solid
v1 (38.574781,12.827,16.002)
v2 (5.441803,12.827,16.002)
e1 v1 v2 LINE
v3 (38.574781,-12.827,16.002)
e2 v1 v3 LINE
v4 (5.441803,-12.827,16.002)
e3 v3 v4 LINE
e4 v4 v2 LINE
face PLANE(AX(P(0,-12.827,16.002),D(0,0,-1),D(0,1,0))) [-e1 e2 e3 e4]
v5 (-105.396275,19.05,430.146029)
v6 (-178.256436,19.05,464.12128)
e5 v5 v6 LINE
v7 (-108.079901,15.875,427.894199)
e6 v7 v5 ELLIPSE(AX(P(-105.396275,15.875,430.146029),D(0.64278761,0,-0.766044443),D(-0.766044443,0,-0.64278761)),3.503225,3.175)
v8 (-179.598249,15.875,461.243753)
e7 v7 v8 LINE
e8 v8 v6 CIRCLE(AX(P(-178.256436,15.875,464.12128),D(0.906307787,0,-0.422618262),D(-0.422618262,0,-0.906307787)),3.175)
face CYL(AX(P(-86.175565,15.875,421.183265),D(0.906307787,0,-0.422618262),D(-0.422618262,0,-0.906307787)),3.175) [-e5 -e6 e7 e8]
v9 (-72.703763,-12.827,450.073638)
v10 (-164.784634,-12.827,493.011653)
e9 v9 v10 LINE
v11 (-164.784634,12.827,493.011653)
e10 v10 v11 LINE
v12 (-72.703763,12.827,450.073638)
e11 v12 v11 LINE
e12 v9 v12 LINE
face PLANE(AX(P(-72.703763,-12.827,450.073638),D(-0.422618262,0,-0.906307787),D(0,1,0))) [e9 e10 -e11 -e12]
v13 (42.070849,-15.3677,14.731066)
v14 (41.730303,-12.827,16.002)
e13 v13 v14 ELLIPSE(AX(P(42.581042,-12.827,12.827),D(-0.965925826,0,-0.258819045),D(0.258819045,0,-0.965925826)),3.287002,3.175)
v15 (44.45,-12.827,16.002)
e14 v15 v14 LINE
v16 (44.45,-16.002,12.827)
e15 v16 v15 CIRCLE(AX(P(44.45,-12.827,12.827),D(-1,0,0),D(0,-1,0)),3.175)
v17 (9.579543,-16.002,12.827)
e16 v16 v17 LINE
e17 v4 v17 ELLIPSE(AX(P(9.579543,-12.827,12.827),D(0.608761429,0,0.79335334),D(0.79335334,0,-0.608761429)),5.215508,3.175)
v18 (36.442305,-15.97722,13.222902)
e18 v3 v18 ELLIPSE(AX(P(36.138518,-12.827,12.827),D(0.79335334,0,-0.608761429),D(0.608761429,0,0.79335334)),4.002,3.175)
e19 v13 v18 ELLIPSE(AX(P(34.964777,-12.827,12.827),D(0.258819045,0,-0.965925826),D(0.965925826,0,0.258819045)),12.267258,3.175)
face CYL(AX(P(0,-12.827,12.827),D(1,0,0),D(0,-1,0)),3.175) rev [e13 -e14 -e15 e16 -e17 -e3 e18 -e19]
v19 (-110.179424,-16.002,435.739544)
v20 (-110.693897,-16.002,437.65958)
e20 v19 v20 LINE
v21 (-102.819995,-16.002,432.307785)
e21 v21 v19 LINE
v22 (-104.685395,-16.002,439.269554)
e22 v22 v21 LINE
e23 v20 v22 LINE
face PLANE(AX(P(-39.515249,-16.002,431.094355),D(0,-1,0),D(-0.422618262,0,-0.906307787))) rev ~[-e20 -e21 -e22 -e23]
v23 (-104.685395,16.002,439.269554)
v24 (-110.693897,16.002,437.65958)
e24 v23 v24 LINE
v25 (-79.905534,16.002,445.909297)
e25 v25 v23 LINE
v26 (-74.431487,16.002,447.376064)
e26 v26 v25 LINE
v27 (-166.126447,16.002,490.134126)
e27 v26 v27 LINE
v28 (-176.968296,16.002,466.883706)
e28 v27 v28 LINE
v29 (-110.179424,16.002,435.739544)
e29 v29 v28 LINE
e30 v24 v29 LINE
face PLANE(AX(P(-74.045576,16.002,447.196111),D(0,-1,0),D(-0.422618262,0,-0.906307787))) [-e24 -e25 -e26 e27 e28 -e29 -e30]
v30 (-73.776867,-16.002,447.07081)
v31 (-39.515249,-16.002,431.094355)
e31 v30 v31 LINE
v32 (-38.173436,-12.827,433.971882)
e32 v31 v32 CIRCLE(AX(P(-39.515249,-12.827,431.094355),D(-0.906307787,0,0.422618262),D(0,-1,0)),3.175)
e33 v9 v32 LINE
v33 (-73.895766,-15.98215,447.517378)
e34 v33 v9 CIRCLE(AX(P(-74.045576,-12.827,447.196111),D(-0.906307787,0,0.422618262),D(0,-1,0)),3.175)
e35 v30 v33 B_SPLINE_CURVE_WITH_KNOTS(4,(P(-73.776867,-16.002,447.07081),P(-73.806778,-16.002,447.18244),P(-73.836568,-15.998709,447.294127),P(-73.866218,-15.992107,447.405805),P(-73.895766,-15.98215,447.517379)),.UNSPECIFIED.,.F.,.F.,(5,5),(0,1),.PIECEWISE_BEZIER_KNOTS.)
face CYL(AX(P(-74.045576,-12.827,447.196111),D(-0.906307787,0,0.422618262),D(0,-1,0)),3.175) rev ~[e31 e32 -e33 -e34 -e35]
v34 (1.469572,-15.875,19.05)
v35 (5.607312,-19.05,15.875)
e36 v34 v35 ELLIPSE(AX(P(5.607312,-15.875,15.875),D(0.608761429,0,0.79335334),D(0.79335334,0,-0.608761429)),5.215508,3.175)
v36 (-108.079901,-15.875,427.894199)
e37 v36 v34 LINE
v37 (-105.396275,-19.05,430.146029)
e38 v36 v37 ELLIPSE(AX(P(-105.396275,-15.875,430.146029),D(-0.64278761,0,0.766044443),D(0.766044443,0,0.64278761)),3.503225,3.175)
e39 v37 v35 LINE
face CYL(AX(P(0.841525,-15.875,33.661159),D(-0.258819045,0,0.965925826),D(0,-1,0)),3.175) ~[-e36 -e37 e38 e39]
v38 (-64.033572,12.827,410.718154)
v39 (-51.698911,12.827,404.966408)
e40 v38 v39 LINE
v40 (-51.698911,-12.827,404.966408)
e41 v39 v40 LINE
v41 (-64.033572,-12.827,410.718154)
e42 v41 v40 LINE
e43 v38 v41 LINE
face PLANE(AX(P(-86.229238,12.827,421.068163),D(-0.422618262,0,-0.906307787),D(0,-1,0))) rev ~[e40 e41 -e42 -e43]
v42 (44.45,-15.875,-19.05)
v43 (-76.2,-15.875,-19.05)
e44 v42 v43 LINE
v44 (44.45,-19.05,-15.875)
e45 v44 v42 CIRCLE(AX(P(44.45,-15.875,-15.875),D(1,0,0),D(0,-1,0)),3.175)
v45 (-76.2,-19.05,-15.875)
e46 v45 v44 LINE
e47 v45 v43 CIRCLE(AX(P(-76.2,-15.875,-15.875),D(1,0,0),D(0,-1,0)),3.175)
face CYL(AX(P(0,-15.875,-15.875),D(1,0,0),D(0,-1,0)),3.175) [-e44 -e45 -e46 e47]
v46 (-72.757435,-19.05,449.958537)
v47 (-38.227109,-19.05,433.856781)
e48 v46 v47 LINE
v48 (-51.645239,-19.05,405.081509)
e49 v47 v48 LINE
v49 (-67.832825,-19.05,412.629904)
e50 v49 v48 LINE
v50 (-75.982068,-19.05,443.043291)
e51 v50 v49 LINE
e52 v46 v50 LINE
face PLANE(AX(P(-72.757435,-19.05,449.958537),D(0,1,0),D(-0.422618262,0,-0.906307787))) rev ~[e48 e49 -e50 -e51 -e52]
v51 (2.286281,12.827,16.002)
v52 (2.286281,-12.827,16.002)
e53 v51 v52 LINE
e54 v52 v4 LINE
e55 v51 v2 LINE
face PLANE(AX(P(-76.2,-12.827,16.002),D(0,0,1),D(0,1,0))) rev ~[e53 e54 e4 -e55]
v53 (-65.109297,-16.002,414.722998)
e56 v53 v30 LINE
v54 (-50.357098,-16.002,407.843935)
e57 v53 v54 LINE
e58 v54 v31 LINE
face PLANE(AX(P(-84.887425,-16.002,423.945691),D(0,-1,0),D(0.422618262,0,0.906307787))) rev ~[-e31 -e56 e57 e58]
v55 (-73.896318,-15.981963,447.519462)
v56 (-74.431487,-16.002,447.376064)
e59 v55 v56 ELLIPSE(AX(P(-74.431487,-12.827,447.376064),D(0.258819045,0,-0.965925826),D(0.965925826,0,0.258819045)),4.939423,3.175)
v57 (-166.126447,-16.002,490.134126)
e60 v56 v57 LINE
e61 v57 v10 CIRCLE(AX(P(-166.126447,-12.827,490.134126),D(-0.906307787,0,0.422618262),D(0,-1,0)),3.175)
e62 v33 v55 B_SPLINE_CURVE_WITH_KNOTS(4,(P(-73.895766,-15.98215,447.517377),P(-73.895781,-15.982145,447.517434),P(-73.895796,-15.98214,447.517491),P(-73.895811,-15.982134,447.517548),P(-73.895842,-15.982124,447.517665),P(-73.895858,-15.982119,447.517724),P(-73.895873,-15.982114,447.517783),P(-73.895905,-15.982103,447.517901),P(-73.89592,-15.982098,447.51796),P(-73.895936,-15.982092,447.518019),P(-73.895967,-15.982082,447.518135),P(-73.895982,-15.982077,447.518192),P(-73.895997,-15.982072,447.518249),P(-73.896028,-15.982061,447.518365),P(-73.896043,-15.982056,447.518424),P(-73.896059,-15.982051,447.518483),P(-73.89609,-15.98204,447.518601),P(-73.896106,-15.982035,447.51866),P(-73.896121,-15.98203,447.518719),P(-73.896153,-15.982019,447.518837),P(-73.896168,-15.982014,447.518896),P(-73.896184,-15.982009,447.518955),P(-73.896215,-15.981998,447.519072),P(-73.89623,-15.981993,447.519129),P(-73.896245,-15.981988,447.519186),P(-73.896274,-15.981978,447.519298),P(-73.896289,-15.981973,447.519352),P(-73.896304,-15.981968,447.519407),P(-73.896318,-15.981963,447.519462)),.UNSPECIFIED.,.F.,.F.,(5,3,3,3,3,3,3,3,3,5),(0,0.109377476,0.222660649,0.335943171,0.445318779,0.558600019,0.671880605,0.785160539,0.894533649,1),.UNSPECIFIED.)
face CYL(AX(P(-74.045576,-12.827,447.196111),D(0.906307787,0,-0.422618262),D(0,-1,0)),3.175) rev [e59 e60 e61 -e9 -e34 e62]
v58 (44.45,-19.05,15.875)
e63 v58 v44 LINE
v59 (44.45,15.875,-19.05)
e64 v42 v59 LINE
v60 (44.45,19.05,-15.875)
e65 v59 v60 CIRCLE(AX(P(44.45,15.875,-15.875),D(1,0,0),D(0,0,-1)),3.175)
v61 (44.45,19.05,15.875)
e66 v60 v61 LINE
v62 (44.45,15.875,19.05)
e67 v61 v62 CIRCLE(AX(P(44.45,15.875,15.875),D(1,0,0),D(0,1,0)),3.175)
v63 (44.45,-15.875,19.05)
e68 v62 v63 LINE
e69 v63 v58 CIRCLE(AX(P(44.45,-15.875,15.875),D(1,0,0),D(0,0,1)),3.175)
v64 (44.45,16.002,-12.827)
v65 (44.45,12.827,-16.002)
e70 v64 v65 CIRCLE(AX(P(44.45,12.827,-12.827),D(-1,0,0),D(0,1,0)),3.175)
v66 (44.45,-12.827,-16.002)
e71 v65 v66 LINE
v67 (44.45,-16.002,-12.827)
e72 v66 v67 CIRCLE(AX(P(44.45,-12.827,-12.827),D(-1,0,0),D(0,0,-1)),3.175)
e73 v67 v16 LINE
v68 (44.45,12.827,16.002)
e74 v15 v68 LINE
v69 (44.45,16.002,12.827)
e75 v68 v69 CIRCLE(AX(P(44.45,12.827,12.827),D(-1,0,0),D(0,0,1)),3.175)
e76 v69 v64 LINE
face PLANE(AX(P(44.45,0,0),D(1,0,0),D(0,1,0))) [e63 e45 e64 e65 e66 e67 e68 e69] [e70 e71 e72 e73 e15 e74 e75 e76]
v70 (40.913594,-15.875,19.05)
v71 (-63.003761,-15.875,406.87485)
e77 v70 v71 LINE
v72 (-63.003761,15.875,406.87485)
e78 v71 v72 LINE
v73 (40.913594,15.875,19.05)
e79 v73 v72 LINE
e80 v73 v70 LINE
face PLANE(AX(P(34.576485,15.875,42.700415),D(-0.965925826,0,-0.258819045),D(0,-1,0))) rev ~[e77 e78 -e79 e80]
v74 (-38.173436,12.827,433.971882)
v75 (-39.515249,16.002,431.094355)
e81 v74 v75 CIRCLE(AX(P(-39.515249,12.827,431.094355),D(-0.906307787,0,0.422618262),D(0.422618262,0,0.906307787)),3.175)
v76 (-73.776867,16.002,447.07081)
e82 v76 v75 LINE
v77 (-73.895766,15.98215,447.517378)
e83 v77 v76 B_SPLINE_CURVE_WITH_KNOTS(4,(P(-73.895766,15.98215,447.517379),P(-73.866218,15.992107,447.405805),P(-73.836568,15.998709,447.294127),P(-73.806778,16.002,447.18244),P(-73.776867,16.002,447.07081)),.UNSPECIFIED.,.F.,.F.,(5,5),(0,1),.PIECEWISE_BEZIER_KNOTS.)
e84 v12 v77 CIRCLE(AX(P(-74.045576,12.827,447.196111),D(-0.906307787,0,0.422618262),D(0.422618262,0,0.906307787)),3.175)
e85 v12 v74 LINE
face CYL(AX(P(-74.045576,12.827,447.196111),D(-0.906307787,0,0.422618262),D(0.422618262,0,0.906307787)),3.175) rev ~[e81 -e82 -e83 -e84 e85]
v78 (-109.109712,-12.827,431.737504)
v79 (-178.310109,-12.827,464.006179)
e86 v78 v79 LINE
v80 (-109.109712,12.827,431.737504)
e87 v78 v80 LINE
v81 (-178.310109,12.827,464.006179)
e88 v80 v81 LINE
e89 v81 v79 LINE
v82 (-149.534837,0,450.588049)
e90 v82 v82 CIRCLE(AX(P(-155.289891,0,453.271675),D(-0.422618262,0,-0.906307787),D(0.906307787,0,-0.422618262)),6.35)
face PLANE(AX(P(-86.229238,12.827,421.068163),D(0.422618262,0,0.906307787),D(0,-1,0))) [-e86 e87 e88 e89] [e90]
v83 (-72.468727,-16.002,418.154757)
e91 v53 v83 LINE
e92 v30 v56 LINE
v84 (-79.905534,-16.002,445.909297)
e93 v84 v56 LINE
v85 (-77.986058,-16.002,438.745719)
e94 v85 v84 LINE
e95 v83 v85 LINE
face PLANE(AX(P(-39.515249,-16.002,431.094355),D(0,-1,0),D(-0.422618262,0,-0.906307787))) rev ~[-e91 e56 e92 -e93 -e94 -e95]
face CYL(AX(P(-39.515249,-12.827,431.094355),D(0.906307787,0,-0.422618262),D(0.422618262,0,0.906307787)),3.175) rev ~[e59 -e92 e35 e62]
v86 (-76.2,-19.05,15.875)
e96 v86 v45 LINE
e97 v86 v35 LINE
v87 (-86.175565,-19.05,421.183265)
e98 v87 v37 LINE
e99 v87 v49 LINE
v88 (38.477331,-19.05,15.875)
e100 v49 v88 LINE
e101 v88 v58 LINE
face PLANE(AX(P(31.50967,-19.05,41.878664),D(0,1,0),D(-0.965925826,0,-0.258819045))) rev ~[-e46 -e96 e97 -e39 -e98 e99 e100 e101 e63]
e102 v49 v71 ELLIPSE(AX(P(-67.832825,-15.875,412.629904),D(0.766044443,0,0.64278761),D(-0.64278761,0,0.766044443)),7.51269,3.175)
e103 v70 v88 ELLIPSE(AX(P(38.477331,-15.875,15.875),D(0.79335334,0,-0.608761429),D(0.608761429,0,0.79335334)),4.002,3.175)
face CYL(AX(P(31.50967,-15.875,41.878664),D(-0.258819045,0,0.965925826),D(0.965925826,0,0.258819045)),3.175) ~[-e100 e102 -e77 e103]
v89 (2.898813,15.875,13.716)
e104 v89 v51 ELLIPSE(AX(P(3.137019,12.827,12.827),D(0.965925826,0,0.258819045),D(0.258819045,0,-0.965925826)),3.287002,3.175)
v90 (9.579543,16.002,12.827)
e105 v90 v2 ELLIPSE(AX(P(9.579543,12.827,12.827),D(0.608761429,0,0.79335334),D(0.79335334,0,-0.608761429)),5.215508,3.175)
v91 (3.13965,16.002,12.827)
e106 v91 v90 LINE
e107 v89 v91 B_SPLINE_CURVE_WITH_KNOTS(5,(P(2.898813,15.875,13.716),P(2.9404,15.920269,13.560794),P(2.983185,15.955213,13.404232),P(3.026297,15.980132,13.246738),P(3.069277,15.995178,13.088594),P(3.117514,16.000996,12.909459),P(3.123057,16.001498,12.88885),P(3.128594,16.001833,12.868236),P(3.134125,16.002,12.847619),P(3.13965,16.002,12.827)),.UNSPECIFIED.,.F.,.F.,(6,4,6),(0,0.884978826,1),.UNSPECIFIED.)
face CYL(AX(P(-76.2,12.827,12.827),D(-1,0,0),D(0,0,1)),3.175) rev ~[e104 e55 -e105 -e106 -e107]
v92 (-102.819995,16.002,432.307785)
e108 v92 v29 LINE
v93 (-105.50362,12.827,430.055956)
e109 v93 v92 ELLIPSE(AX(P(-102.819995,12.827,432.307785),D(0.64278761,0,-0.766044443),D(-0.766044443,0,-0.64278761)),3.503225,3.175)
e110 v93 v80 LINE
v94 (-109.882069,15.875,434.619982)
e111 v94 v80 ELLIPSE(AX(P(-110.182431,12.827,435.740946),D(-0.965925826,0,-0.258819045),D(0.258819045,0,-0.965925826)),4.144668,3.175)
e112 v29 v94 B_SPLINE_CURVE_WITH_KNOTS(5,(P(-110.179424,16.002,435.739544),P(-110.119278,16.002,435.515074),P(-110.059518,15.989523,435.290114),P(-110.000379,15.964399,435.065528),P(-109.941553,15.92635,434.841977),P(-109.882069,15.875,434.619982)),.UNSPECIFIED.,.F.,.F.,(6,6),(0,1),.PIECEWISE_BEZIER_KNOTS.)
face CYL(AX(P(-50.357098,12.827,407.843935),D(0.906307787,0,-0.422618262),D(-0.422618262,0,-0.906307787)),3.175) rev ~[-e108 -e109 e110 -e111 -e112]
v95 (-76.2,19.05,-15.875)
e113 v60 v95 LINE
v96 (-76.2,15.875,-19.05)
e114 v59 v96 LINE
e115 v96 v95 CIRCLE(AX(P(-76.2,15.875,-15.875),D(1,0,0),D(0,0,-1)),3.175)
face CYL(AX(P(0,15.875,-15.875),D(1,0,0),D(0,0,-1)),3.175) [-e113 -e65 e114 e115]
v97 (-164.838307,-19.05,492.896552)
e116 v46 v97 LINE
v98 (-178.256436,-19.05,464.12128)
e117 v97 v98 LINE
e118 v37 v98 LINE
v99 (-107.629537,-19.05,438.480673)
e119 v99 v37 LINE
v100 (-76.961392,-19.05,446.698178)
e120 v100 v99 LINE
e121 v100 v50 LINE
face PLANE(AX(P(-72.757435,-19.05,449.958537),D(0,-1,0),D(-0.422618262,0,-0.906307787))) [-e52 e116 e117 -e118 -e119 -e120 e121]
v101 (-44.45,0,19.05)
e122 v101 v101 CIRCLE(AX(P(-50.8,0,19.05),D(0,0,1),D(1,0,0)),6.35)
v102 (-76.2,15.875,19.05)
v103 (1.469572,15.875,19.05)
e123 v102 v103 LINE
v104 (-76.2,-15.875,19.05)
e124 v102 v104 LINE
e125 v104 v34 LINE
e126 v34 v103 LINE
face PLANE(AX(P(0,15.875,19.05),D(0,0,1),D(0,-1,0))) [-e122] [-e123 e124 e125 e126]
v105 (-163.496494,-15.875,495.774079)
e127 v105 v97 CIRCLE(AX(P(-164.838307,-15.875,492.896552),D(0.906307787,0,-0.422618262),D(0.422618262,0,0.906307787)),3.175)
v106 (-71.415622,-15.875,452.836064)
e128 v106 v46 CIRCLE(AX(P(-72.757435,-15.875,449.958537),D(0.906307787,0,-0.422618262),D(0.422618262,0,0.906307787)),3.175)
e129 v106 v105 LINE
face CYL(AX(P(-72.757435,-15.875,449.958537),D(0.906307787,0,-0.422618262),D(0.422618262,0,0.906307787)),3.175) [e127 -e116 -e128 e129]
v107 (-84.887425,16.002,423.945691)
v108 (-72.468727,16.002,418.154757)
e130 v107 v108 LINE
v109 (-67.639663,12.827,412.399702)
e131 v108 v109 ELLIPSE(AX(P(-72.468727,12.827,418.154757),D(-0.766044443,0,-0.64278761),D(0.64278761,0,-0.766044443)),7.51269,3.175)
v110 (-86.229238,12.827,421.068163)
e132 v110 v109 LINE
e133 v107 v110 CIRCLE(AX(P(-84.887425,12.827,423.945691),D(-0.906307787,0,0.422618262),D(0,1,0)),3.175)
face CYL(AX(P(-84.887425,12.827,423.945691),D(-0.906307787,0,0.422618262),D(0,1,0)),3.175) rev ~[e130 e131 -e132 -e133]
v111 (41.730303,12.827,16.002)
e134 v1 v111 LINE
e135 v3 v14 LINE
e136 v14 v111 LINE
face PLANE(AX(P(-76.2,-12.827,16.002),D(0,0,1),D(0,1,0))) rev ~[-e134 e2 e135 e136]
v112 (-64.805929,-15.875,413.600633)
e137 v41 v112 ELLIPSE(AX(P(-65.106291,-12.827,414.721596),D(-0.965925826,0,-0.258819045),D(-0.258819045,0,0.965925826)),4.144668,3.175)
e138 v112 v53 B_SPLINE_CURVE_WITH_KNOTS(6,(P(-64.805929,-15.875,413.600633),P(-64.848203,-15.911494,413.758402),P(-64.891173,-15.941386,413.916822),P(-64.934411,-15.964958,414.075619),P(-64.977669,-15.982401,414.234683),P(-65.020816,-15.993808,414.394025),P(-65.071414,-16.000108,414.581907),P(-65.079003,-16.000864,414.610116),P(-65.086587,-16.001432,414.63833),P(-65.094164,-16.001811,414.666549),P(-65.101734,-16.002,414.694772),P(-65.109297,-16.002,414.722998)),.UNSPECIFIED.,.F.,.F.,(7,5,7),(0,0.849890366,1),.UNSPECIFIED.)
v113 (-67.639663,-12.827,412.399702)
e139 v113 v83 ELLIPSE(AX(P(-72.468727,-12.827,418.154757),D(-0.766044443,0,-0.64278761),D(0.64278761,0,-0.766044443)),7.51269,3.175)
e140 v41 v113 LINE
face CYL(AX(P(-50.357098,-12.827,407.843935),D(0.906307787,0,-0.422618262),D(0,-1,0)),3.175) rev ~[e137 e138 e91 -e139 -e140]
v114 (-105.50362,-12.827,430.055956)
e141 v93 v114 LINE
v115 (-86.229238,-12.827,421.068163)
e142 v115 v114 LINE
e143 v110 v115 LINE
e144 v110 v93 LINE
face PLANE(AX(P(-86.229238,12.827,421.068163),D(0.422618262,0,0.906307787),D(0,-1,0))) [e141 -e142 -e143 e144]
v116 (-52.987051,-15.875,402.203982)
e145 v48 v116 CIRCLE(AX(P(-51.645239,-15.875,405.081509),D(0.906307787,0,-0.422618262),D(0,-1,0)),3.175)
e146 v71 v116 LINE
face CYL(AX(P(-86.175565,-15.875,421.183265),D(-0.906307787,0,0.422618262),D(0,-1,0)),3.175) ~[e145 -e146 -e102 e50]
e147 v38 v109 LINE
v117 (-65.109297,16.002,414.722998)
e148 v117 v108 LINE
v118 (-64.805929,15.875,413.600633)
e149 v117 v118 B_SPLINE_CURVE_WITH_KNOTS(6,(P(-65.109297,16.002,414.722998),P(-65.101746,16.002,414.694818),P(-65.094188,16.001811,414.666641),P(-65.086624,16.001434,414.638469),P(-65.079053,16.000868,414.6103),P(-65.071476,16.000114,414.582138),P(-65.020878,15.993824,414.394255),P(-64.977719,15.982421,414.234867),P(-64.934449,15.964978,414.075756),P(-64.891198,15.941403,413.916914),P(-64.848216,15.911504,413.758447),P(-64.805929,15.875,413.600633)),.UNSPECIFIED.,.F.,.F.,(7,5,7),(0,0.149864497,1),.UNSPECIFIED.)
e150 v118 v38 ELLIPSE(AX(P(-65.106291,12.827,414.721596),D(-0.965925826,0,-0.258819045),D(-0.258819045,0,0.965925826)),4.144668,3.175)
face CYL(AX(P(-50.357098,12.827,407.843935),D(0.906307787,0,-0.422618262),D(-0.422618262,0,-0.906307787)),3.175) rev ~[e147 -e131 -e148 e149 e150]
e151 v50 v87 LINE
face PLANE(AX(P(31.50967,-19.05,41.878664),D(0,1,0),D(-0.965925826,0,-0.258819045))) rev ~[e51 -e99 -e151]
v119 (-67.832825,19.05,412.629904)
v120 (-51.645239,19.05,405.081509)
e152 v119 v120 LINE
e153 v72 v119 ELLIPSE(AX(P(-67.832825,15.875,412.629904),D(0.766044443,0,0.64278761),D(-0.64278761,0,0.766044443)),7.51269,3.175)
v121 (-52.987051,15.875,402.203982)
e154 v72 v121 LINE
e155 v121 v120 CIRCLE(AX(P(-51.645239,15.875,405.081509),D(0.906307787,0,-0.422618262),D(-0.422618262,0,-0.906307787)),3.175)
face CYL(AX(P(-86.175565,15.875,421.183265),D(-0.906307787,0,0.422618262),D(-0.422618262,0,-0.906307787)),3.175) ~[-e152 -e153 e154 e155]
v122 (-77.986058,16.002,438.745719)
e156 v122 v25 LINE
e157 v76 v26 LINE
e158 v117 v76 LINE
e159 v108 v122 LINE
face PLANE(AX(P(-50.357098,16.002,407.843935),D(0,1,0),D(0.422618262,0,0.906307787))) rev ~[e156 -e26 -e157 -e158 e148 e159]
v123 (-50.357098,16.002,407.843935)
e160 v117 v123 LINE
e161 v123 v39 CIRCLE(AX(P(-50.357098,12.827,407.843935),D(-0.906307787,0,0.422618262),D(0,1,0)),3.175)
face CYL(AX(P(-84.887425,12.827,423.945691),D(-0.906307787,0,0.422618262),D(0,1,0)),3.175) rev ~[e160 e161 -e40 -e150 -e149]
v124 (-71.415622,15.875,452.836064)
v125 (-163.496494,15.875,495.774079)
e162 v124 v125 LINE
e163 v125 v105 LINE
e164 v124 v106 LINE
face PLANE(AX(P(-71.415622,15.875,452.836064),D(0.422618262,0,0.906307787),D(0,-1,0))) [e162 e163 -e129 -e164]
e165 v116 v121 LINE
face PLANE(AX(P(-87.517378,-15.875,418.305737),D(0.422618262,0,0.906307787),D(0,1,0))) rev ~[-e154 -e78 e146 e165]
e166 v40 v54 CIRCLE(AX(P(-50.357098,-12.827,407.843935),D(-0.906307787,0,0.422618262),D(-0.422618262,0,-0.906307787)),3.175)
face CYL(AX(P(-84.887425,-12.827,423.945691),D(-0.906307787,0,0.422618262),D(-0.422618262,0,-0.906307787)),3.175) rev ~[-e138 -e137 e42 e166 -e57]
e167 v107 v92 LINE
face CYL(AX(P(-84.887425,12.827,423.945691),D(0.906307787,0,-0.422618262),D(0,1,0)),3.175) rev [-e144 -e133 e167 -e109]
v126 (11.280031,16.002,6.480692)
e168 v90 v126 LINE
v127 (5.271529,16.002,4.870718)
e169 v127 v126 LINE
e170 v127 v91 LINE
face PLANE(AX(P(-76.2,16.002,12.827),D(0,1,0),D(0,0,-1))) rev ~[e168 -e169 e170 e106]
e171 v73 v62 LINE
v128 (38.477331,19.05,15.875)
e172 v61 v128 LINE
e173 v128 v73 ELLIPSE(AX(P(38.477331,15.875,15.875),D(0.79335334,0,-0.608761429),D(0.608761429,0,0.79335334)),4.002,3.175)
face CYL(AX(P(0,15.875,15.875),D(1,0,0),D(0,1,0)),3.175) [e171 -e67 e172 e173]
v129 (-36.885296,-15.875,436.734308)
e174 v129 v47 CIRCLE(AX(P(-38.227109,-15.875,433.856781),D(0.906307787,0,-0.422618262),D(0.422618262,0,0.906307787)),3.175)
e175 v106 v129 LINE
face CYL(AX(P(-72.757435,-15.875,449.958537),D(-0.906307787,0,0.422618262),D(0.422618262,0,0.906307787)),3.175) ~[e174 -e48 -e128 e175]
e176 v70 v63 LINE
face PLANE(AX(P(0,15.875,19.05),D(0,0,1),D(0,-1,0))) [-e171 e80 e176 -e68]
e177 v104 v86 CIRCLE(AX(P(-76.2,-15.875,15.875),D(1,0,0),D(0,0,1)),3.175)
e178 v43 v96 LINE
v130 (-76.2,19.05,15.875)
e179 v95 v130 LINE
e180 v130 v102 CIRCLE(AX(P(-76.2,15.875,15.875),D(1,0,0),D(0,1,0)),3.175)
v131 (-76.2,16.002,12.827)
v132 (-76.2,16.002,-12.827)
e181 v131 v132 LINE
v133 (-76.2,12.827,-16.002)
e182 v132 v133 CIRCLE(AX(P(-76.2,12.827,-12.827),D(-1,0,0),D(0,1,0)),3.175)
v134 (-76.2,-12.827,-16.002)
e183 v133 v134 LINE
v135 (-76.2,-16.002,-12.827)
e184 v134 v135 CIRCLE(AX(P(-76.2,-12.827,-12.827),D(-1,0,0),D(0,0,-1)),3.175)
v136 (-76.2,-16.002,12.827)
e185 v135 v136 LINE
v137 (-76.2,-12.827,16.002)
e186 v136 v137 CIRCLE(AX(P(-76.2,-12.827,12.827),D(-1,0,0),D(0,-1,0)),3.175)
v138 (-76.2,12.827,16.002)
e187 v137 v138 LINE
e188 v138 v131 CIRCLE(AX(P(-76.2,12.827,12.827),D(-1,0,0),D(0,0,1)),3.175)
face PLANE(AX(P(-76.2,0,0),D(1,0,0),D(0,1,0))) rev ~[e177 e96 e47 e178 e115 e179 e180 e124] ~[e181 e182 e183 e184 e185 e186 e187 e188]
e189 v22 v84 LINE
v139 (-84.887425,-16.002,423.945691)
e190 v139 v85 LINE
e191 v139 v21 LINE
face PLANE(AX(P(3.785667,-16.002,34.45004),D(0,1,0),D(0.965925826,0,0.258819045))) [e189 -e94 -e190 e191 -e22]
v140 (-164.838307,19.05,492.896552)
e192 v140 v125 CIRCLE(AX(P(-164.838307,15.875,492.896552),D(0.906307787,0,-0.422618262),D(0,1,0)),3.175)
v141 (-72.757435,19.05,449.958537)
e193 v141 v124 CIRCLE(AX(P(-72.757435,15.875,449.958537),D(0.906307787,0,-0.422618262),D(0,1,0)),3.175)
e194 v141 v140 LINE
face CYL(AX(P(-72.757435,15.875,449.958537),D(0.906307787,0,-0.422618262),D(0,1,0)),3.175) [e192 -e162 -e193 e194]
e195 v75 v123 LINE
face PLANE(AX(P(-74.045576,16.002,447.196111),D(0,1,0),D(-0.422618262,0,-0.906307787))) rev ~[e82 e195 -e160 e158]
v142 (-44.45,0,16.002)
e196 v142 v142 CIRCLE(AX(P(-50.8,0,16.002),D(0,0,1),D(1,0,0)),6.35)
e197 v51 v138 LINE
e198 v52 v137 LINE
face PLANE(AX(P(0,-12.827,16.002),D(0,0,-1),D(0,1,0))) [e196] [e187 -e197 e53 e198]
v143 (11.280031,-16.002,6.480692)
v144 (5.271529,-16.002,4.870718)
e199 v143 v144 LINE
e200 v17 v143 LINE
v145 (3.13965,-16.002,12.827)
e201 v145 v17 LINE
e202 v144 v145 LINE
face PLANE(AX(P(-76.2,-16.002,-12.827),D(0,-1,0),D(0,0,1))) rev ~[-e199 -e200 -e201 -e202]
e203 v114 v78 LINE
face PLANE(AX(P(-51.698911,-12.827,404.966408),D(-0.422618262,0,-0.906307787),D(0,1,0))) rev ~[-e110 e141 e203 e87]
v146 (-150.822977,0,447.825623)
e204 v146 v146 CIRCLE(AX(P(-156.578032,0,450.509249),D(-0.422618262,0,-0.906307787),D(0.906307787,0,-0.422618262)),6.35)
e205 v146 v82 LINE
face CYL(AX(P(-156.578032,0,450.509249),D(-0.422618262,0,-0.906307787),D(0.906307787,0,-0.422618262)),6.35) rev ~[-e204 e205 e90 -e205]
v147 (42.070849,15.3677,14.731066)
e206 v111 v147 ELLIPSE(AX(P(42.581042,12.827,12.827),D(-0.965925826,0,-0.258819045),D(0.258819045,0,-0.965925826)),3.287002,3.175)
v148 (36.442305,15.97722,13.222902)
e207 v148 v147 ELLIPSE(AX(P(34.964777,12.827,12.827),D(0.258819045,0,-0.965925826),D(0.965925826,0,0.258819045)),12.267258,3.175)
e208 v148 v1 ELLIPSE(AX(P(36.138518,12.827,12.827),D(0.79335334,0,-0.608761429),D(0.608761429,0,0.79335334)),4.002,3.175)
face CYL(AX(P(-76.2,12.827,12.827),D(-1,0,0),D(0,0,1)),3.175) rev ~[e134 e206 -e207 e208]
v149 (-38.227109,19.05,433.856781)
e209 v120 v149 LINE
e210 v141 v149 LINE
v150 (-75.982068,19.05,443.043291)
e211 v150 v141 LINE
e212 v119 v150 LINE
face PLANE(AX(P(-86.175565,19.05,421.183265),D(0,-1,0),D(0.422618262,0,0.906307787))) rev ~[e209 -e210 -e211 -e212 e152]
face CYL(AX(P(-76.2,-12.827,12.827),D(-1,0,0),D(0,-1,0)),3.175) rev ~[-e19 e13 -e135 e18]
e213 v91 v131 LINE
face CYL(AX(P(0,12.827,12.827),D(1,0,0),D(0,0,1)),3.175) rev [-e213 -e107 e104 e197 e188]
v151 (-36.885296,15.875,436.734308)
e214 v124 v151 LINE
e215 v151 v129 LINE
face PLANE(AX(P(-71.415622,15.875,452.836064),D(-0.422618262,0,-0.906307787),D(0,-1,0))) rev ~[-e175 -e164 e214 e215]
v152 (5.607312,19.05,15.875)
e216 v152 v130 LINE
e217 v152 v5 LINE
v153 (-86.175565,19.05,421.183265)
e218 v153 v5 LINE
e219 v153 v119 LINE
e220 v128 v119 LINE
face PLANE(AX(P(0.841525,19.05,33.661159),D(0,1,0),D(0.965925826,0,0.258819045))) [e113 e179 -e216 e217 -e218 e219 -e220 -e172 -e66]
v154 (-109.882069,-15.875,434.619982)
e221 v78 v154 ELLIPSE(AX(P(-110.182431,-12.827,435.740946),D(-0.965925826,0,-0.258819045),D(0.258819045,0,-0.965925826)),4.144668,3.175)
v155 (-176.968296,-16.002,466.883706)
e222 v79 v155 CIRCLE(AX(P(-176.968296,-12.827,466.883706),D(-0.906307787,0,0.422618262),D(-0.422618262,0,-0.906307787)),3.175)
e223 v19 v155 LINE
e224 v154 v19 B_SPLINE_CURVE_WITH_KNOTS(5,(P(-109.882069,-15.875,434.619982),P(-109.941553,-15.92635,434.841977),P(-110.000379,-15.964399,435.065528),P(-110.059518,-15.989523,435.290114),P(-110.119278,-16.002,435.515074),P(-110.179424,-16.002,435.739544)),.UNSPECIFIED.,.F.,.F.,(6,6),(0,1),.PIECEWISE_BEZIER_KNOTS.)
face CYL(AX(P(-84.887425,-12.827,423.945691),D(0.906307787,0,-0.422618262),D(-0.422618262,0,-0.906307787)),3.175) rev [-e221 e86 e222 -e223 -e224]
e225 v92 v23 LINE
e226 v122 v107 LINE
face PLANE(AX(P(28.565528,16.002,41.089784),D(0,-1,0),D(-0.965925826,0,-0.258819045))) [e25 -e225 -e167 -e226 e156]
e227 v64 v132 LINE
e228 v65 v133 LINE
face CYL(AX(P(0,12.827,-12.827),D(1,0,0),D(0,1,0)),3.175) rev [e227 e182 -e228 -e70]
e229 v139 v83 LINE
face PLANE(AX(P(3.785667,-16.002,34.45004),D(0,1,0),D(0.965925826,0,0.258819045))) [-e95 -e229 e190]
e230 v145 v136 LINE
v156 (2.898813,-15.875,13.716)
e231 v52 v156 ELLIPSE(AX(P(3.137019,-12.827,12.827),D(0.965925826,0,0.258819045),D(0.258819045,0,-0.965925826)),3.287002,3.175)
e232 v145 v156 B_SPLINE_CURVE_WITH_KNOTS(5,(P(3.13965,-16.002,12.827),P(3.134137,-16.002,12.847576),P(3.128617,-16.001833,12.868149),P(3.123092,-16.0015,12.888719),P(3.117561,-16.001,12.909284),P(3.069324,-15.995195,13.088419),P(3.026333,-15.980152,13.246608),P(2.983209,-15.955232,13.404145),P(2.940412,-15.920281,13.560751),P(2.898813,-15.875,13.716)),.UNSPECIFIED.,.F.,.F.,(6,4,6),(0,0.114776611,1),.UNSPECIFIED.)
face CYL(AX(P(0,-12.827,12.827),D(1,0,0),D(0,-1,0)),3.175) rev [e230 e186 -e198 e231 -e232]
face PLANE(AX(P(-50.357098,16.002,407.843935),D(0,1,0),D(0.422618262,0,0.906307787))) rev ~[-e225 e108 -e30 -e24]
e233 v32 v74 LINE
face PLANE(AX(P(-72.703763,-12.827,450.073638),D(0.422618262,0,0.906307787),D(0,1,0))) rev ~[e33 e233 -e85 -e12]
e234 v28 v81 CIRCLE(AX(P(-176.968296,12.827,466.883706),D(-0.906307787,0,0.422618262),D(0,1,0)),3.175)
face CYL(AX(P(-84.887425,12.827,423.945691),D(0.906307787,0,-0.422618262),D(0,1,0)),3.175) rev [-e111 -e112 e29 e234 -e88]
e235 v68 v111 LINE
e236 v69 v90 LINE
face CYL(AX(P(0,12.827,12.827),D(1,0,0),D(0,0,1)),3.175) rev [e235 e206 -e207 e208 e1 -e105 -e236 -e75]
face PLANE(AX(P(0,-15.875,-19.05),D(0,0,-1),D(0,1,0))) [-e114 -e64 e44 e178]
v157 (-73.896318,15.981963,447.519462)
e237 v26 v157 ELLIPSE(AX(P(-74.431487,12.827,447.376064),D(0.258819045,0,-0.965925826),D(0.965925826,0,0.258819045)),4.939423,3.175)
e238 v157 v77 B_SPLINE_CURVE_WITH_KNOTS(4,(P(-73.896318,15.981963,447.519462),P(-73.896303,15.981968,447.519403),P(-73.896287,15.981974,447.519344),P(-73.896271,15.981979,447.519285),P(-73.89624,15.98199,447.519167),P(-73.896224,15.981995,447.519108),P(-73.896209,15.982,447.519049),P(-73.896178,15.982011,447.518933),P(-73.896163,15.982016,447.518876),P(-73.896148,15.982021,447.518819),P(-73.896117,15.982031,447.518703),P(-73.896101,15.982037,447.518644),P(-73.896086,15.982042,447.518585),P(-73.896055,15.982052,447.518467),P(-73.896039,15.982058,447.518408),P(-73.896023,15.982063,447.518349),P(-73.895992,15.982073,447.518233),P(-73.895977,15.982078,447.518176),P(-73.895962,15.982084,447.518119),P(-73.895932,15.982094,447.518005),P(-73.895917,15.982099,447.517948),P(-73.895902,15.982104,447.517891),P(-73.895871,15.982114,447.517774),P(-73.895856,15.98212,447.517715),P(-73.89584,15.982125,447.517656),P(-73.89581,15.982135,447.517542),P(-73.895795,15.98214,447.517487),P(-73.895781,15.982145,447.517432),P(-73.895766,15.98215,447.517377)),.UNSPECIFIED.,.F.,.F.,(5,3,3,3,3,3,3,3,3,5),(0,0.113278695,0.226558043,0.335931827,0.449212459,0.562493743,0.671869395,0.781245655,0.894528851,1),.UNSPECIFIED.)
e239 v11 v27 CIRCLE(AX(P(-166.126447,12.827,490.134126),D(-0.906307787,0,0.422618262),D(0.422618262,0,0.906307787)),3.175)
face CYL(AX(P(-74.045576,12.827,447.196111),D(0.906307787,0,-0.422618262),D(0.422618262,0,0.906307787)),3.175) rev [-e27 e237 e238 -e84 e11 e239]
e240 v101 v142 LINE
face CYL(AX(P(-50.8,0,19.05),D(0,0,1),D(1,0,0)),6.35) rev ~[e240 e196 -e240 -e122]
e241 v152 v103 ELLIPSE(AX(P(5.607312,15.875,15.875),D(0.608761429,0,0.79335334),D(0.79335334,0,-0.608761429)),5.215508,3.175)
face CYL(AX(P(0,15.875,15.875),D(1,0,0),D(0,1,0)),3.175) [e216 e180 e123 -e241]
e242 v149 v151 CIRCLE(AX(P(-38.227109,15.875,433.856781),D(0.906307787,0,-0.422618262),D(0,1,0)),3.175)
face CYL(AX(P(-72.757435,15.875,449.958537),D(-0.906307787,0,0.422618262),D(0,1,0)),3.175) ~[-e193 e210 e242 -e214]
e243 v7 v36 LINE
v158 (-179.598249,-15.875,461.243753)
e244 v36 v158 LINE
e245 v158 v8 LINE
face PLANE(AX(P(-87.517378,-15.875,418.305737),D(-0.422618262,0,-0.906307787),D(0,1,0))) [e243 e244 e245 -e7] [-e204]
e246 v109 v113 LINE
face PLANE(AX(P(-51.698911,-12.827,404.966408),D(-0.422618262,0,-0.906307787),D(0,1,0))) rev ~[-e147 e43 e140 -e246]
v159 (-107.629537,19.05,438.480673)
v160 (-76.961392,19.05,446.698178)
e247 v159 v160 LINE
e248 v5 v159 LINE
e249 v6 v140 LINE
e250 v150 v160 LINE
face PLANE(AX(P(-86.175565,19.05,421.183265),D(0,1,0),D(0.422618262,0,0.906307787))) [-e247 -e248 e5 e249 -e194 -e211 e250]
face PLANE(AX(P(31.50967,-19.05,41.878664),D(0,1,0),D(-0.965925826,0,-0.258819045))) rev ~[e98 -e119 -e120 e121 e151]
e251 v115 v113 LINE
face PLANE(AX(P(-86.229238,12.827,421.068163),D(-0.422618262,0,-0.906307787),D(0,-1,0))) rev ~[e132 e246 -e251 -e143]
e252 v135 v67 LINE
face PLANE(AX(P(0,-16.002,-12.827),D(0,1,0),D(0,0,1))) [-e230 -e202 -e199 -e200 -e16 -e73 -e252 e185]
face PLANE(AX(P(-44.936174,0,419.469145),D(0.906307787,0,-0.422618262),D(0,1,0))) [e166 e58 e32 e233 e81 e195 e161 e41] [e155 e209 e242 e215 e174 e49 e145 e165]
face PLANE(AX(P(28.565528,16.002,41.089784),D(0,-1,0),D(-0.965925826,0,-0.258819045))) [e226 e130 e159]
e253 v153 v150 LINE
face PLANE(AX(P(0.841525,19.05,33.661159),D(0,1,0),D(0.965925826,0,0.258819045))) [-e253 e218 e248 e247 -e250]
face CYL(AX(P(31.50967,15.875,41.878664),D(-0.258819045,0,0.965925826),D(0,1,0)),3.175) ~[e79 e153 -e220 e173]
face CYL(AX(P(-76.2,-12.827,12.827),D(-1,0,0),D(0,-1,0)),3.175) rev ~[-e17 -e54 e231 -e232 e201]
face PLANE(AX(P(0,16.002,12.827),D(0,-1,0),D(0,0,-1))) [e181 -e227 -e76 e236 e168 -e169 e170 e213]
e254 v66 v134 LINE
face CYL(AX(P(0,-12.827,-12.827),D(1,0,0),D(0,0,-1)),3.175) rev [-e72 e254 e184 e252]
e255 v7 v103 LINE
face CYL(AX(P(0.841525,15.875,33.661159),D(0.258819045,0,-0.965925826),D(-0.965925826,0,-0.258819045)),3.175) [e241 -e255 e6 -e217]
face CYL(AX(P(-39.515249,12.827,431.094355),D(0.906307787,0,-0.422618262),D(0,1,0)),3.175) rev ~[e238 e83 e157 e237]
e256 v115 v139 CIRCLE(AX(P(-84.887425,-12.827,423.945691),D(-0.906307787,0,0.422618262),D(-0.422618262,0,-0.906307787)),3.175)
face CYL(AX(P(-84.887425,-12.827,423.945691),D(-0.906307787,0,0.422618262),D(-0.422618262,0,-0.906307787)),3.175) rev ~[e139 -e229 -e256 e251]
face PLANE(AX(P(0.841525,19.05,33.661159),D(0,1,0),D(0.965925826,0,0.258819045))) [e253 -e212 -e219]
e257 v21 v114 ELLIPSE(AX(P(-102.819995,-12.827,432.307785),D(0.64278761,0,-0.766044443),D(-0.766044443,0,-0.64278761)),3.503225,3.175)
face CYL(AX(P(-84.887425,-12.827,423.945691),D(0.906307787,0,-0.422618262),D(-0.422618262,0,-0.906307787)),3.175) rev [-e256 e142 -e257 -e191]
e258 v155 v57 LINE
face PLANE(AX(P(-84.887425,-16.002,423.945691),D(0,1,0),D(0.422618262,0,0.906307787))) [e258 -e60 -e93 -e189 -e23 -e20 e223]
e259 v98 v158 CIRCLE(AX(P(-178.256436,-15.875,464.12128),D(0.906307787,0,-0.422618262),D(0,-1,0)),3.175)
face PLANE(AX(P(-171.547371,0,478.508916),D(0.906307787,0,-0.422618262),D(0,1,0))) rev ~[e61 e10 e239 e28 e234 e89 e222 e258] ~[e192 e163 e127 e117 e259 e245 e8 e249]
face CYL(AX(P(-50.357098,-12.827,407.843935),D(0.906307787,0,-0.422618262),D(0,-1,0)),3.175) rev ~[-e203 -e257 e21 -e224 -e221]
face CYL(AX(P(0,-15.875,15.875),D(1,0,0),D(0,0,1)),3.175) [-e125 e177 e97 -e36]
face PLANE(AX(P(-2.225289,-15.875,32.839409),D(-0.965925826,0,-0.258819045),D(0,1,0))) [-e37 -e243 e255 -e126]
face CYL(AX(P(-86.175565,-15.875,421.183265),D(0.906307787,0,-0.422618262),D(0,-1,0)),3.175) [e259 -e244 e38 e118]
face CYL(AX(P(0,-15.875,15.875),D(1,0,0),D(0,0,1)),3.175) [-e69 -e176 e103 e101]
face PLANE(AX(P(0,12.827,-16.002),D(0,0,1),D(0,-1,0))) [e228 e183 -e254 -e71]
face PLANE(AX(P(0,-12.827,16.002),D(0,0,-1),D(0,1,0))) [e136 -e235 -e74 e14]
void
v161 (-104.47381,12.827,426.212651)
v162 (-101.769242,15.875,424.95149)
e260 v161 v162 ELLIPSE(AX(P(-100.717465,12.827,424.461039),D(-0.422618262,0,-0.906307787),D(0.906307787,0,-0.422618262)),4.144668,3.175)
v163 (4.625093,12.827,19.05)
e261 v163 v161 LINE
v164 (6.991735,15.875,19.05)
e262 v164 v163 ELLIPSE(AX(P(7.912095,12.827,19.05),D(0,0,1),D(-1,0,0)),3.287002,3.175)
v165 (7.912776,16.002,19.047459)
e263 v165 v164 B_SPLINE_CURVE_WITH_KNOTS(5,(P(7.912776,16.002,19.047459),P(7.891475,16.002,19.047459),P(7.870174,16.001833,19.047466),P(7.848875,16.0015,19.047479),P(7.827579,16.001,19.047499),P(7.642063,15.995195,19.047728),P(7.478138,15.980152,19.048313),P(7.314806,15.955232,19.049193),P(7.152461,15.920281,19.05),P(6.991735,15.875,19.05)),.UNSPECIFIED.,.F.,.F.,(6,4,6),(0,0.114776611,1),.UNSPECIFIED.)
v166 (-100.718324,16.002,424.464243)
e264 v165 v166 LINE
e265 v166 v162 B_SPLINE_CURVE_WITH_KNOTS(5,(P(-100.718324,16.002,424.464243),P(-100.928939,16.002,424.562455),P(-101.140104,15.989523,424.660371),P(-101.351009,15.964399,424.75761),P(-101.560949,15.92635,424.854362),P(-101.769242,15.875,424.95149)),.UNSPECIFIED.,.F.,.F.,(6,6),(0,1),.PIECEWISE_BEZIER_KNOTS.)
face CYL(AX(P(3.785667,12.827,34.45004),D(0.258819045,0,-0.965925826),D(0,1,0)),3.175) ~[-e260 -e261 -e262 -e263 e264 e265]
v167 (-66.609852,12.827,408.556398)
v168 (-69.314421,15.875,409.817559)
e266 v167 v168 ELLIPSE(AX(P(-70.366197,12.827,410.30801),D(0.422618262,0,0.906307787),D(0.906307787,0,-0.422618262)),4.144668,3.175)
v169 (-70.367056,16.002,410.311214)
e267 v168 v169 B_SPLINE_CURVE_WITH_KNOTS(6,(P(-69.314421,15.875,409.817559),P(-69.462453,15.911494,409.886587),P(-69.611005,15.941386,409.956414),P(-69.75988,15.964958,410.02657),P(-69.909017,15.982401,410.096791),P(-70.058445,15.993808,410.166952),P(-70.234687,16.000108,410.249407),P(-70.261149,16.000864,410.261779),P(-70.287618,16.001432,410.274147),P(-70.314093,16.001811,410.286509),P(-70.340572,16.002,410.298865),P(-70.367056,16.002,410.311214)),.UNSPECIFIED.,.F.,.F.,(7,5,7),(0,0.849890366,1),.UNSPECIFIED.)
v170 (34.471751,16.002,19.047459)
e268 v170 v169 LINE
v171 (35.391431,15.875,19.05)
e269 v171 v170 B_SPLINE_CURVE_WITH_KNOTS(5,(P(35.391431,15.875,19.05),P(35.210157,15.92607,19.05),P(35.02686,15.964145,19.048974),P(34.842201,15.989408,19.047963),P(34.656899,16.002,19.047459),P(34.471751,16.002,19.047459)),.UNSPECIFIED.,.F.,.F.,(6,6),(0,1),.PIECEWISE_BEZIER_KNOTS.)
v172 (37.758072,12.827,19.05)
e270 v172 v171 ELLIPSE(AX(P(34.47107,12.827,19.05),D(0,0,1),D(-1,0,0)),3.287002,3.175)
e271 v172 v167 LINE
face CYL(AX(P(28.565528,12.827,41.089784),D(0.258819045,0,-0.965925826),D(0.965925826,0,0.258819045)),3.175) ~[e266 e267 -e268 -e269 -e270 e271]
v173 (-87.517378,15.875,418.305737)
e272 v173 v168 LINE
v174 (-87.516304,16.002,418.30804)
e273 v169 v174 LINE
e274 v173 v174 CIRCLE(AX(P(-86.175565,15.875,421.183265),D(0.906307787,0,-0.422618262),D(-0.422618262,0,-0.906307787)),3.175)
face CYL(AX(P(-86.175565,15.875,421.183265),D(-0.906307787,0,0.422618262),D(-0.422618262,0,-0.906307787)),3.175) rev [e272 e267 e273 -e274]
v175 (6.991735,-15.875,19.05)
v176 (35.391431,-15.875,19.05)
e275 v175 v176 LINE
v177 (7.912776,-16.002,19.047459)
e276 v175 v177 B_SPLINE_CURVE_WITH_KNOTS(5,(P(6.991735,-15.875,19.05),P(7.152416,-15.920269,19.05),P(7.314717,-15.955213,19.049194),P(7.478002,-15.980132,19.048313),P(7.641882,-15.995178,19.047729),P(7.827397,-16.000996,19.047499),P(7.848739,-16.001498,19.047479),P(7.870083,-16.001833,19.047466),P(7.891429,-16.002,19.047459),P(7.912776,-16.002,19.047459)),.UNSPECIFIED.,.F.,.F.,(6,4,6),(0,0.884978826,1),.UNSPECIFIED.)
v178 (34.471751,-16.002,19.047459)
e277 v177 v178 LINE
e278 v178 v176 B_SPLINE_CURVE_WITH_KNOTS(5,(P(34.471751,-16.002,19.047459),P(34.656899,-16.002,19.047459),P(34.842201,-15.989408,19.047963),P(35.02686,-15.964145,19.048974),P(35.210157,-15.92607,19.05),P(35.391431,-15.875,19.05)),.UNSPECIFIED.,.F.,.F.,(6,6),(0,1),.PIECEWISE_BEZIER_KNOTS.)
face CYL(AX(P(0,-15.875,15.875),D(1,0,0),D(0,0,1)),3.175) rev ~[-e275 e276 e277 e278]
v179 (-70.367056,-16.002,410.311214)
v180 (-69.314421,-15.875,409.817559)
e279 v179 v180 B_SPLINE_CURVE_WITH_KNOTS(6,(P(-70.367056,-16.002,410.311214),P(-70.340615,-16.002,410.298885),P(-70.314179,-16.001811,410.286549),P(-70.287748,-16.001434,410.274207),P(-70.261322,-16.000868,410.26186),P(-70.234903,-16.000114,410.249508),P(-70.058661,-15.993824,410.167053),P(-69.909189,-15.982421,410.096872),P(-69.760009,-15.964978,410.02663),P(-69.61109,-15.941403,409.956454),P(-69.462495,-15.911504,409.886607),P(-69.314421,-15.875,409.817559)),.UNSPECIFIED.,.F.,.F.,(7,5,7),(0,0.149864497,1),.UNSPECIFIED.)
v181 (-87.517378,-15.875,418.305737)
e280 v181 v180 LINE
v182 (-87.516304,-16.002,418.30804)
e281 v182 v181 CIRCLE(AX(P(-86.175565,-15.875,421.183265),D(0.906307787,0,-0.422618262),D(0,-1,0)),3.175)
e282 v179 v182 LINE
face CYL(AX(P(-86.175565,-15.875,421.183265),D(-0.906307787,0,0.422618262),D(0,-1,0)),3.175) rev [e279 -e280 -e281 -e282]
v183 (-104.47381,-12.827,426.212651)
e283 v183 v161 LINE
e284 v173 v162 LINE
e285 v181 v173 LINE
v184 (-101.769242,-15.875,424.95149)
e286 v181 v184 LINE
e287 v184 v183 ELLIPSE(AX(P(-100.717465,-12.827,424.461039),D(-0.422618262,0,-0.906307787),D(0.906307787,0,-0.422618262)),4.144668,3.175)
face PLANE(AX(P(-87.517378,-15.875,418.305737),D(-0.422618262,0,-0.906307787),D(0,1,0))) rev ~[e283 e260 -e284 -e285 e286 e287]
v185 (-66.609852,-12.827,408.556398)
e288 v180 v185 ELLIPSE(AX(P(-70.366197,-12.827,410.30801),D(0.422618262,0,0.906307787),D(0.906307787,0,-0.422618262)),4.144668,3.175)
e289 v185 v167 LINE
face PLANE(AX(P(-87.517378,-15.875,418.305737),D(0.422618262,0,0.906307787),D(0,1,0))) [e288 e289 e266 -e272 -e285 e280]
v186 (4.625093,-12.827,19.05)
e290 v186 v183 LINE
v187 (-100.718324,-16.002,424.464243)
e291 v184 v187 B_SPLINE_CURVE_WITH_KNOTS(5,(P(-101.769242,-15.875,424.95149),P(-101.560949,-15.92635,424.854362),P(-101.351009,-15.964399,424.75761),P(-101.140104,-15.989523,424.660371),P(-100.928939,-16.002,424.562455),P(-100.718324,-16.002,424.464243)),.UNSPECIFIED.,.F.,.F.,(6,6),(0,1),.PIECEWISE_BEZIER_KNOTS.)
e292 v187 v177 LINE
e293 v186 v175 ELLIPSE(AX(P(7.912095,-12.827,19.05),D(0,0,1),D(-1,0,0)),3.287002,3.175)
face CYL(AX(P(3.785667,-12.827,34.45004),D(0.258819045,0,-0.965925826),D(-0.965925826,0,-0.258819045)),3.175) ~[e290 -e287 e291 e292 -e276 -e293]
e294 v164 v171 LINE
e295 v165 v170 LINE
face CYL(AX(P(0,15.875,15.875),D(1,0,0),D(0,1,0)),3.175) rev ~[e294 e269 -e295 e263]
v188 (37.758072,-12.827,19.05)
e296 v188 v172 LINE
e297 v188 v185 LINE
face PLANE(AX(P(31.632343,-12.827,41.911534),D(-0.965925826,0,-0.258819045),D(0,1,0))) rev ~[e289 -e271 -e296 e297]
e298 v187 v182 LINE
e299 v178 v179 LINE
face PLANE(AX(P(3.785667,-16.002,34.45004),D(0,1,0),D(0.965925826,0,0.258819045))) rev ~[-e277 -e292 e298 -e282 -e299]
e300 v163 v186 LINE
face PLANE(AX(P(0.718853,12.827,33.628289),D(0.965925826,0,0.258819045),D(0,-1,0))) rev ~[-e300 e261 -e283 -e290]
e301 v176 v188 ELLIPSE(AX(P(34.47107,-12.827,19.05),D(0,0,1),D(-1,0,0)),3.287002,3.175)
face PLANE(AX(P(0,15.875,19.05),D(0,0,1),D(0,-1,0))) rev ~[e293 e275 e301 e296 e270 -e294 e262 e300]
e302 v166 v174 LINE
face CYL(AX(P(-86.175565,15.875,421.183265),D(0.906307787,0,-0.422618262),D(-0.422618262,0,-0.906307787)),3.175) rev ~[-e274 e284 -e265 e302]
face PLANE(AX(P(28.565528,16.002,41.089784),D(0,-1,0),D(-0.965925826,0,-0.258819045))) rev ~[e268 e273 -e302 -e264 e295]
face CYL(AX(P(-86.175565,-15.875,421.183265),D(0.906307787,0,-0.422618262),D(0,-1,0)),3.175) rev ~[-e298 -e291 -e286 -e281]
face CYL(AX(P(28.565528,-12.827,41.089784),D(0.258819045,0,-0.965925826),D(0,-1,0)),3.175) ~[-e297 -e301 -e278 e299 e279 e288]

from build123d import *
from build123d import SkipClean  # not in build123d's __all__

# Parameters (mm, degrees)
F1_DEPTH       = 44.45
F1_DEPTH_BACK  = 76.2
F5_DEPTH       = 419.1
F5_DEPTH_BACK  = 28.956
F7_DEPTH       = 145.288
F10_DEPTH      = 38.1
F10_DEPTH_BACK = 101.6
F12_DEPTH      = 154.2941466414
F13_R          = 6.35
F14_DEPTH      = 6.35
F15_R          = 6.35
F16_DEPTH      = 6.35


with BuildPart() as f1:
    # F0 (on Right) → F1 (new body, two sides)
    with BuildSketch(Plane.YZ) as f1_sk:
        with BuildLine():
            ThreePointArc((19.05, 15.875), (18.1200640303, 18.1200640303), (15.875, 19.05))
            Line((15.875, 19.05), (-15.875, 19.05))
            ThreePointArc((-15.875, 19.05), (-18.1200640303, 18.1200640303), (-19.05, 15.875))
            Line((-19.05, 15.875), (-19.05, -15.875))
            ThreePointArc((-19.05, -15.875), (-18.1200640303, -18.1200640303), (-15.875, -19.05))
            Line((-15.875, -19.05), (15.875, -19.05))
            ThreePointArc((15.875, -19.05), (18.1200640303, -18.1200640303), (19.05, -15.875))
            Line((19.05, -15.875), (19.05, 15.875))
        make_face()
        with BuildLine():
            Line((-16.002, -12.827), (-16.002, 12.827))
            ThreePointArc((-16.002, 12.827), (-15.0720640303, 15.0720640303), (-12.827, 16.002))
            Line((-12.827, 16.002), (12.827, 16.002))
            ThreePointArc((12.827, 16.002), (15.0720640303, 15.0720640303), (16.002, 12.827))
            Line((16.002, 12.827), (16.002, -12.827))
            ThreePointArc((16.002, -12.827), (15.0720640303, -15.0720640303), (12.827, -16.002))
            Line((12.827, -16.002), (-12.827, -16.002))
            ThreePointArc((-12.827, -16.002), (-15.0720640303, -15.0720640303), (-16.002, -12.827))
        make_face(mode=Mode.SUBTRACT)
    extrude(amount=F1_DEPTH)
    extrude(f1_sk.sketch, amount=-F1_DEPTH_BACK)

    # F4 (on face) → F5 (join, two sides)
    with BuildSketch(Plane(origin=(-8.3589183447, 0, 31.1959079588), x_dir=(0.9659258263, 0, 0.2588190451), z_dir=(0.2588190451, 0, -0.9659258263))) as f5_sk:
        with BuildLine():
            ThreePointArc((44.45, 15.875), (43.5200640303, 18.1200640303), (41.275, 19.05))
            Line((41.275, 19.05), (9.525, 19.05))
            ThreePointArc((9.525, 19.05), (7.2799359697, 18.1200640303), (6.35, 15.875))
            Line((6.35, 15.875), (6.35, -15.875))
            ThreePointArc((6.35, -15.875), (7.2799359697, -18.1200640303), (9.525, -19.05))
            Line((9.525, -19.05), (41.275, -19.05))
            ThreePointArc((41.275, -19.05), (43.5200640303, -18.1200640303), (44.45, -15.875))
            Line((44.45, -15.875), (44.45, 15.875))
        make_face()
        with BuildLine():
            Line((12.573, 16.002), (38.227, 16.002))
            ThreePointArc((38.227, 16.002), (40.4720640303, 15.0720640303), (41.402, 12.827))
            Line((41.402, 12.827), (41.402, -12.827))
            ThreePointArc((41.402, -12.827), (40.4720640303, -15.0720640303), (38.227, -16.002))
            Line((38.227, -16.002), (12.573, -16.002))
            ThreePointArc((12.573, -16.002), (10.3279359697, -15.0720640303), (9.398, -12.827))
            Line((9.398, -12.827), (9.398, 12.827))
            ThreePointArc((9.398, 12.827), (10.3279359697, 15.0720640303), (12.573, 16.002))
        make_face(mode=Mode.SUBTRACT)
    extrude(amount=-F5_DEPTH)
    extrude(f5_sk.sketch, amount=F5_DEPTH_BACK)

    # F6 (on face) → F7 (cut)
    with BuildSketch(Plane(origin=(-76.2, 0, 0), x_dir=(0, -1, 0), z_dir=(-1, 0, 0))):
        with BuildLine():
            Line((12.827, 16.002), (-12.827, 16.002))
            ThreePointArc((-12.827, 16.002), (-15.0720640303, 15.0720640303), (-16.002, 12.827))
            Line((-16.002, 12.827), (-16.002, -12.827))
            ThreePointArc((-16.002, -12.827), (-15.0720640303, -15.0720640303), (-12.827, -16.002))
            Line((-12.827, -16.002), (12.827, -16.002))
            ThreePointArc((12.827, -16.002), (15.0720640303, -15.0720640303), (16.002, -12.827))
            Line((16.002, -12.827), (16.002, 12.827))
            ThreePointArc((16.002, 12.827), (15.0720640303, 15.0720640303), (12.827, 16.002))
        make_face()
    with SkipClean():  # cleaning this boolean's faces spoils the solid; the shape is the same uncleaned
        extrude(amount=-F7_DEPTH, mode=Mode.SUBTRACT)

    # F9 (on face) → F10 (join, two sides)
    with BuildSketch(Plane(origin=(-232.1066250318, 0, 108.2330967608), x_dir=(0, 1, 0), z_dir=(0.906307787, 0, -0.4226182617))) as f10_sk:
        with BuildLine():
            ThreePointArc((19.05, 377.0523048448), (18.1200640303, 379.297368875), (15.875, 380.2273048448))
            Line((15.875, 380.2273048448), (-15.875, 380.2273048448))
            ThreePointArc((-15.875, 380.2273048448), (-18.1200640303, 379.297368875), (-19.05, 377.0523048448))
            Line((-19.05, 377.0523048448), (-19.05, 345.3023048448))
            ThreePointArc((-19.05, 345.3023048448), (-18.1200640303, 343.0572408145), (-15.875, 342.1273048448))
            Line((-15.875, 342.1273048448), (15.875, 342.1273048448))
            ThreePointArc((15.875, 342.1273048448), (18.1200640303, 343.0572408145), (19.05, 345.3023048448))
            Line((19.05, 345.3023048448), (19.05, 377.0523048448))
        make_face()
        with BuildLine():
            Line((-12.827, 377.1793048448), (12.827, 377.1793048448))
            ThreePointArc((12.827, 377.1793048448), (15.0720640303, 376.249368875), (16.002, 374.0043048448))
            Line((16.002, 374.0043048448), (16.002, 348.3503048448))
            ThreePointArc((16.002, 348.3503048448), (15.0720640303, 346.1052408145), (12.827, 345.1753048448))
            Line((12.827, 345.1753048448), (-12.827, 345.1753048448))
            ThreePointArc((-12.827, 345.1753048448), (-15.0720640303, 346.1052408145), (-16.002, 348.3503048448))
            Line((-16.002, 348.3503048448), (-16.002, 374.0043048448))
            ThreePointArc((-16.002, 374.0043048448), (-15.0720640303, 376.249368875), (-12.827, 377.1793048448))
        make_face(mode=Mode.SUBTRACT)
    with SkipClean():  # cleaning this boolean's faces spoils the solid; the shape is the same uncleaned
        extrude(amount=F10_DEPTH)
        extrude(f10_sk.sketch, amount=-F10_DEPTH_BACK)

    # F11 (on face) → F12 (cut, through all)
    with BuildSketch(Plane(origin=(-197.5762983457, 0, 92.1313409885), x_dir=(0, 1, 0), z_dir=(0.906307787, 0, -0.4226182617))):
        with BuildLine():
            ThreePointArc((-12.827, 377.1793048448), (-15.0720640303, 376.249368875), (-16.002, 374.0043048448))
            Line((-16.002, 374.0043048448), (-16.002, 348.3503048448))
            ThreePointArc((-16.002, 348.3503048448), (-15.0720640303, 346.1052408145), (-12.827, 345.1753048448))
            Line((-12.827, 345.1753048448), (12.827, 345.1753048448))
            ThreePointArc((12.827, 345.1753048448), (15.0720640303, 346.1052408145), (16.002, 348.3503048448))
            Line((16.002, 348.3503048448), (16.002, 374.0043048448))
            ThreePointArc((16.002, 374.0043048448), (15.0720640303, 376.249368875), (12.827, 377.1793048448))
            Line((12.827, 377.1793048448), (-12.827, 377.1793048448))
        make_face()
    with SkipClean():  # cleaning this boolean's faces spoils the solid; the shape is the same uncleaned
        extrude(amount=-F12_DEPTH, mode=Mode.SUBTRACT)

    # F13 (on face) → F14 (cut)
    with BuildSketch(Plane.XY.offset(19.05)):
        with Locations((-50.8, 0)):
            Circle(F13_R)
    with SkipClean():  # cleaning this boolean's faces spoils the solid; the shape is the same uncleaned
        extrude(amount=-F14_DEPTH, mode=Mode.SUBTRACT)

    # F15 (on face) → F16 (cut)
    with BuildSketch(Plane(origin=(144.5892468675, 0, 310.0726405387), x_dir=(0.906307787, 0, -0.4226182617), z_dir=(-0.4226182617, 0, -0.906307787))):
        with Locations((-332.301324905, 0)):
            Circle(F15_R)
    with SkipClean():  # cleaning this boolean's faces spoils the solid; the shape is the same uncleaned
        extrude(amount=-F16_DEPTH, mode=Mode.SUBTRACT)


solid = f1.part
